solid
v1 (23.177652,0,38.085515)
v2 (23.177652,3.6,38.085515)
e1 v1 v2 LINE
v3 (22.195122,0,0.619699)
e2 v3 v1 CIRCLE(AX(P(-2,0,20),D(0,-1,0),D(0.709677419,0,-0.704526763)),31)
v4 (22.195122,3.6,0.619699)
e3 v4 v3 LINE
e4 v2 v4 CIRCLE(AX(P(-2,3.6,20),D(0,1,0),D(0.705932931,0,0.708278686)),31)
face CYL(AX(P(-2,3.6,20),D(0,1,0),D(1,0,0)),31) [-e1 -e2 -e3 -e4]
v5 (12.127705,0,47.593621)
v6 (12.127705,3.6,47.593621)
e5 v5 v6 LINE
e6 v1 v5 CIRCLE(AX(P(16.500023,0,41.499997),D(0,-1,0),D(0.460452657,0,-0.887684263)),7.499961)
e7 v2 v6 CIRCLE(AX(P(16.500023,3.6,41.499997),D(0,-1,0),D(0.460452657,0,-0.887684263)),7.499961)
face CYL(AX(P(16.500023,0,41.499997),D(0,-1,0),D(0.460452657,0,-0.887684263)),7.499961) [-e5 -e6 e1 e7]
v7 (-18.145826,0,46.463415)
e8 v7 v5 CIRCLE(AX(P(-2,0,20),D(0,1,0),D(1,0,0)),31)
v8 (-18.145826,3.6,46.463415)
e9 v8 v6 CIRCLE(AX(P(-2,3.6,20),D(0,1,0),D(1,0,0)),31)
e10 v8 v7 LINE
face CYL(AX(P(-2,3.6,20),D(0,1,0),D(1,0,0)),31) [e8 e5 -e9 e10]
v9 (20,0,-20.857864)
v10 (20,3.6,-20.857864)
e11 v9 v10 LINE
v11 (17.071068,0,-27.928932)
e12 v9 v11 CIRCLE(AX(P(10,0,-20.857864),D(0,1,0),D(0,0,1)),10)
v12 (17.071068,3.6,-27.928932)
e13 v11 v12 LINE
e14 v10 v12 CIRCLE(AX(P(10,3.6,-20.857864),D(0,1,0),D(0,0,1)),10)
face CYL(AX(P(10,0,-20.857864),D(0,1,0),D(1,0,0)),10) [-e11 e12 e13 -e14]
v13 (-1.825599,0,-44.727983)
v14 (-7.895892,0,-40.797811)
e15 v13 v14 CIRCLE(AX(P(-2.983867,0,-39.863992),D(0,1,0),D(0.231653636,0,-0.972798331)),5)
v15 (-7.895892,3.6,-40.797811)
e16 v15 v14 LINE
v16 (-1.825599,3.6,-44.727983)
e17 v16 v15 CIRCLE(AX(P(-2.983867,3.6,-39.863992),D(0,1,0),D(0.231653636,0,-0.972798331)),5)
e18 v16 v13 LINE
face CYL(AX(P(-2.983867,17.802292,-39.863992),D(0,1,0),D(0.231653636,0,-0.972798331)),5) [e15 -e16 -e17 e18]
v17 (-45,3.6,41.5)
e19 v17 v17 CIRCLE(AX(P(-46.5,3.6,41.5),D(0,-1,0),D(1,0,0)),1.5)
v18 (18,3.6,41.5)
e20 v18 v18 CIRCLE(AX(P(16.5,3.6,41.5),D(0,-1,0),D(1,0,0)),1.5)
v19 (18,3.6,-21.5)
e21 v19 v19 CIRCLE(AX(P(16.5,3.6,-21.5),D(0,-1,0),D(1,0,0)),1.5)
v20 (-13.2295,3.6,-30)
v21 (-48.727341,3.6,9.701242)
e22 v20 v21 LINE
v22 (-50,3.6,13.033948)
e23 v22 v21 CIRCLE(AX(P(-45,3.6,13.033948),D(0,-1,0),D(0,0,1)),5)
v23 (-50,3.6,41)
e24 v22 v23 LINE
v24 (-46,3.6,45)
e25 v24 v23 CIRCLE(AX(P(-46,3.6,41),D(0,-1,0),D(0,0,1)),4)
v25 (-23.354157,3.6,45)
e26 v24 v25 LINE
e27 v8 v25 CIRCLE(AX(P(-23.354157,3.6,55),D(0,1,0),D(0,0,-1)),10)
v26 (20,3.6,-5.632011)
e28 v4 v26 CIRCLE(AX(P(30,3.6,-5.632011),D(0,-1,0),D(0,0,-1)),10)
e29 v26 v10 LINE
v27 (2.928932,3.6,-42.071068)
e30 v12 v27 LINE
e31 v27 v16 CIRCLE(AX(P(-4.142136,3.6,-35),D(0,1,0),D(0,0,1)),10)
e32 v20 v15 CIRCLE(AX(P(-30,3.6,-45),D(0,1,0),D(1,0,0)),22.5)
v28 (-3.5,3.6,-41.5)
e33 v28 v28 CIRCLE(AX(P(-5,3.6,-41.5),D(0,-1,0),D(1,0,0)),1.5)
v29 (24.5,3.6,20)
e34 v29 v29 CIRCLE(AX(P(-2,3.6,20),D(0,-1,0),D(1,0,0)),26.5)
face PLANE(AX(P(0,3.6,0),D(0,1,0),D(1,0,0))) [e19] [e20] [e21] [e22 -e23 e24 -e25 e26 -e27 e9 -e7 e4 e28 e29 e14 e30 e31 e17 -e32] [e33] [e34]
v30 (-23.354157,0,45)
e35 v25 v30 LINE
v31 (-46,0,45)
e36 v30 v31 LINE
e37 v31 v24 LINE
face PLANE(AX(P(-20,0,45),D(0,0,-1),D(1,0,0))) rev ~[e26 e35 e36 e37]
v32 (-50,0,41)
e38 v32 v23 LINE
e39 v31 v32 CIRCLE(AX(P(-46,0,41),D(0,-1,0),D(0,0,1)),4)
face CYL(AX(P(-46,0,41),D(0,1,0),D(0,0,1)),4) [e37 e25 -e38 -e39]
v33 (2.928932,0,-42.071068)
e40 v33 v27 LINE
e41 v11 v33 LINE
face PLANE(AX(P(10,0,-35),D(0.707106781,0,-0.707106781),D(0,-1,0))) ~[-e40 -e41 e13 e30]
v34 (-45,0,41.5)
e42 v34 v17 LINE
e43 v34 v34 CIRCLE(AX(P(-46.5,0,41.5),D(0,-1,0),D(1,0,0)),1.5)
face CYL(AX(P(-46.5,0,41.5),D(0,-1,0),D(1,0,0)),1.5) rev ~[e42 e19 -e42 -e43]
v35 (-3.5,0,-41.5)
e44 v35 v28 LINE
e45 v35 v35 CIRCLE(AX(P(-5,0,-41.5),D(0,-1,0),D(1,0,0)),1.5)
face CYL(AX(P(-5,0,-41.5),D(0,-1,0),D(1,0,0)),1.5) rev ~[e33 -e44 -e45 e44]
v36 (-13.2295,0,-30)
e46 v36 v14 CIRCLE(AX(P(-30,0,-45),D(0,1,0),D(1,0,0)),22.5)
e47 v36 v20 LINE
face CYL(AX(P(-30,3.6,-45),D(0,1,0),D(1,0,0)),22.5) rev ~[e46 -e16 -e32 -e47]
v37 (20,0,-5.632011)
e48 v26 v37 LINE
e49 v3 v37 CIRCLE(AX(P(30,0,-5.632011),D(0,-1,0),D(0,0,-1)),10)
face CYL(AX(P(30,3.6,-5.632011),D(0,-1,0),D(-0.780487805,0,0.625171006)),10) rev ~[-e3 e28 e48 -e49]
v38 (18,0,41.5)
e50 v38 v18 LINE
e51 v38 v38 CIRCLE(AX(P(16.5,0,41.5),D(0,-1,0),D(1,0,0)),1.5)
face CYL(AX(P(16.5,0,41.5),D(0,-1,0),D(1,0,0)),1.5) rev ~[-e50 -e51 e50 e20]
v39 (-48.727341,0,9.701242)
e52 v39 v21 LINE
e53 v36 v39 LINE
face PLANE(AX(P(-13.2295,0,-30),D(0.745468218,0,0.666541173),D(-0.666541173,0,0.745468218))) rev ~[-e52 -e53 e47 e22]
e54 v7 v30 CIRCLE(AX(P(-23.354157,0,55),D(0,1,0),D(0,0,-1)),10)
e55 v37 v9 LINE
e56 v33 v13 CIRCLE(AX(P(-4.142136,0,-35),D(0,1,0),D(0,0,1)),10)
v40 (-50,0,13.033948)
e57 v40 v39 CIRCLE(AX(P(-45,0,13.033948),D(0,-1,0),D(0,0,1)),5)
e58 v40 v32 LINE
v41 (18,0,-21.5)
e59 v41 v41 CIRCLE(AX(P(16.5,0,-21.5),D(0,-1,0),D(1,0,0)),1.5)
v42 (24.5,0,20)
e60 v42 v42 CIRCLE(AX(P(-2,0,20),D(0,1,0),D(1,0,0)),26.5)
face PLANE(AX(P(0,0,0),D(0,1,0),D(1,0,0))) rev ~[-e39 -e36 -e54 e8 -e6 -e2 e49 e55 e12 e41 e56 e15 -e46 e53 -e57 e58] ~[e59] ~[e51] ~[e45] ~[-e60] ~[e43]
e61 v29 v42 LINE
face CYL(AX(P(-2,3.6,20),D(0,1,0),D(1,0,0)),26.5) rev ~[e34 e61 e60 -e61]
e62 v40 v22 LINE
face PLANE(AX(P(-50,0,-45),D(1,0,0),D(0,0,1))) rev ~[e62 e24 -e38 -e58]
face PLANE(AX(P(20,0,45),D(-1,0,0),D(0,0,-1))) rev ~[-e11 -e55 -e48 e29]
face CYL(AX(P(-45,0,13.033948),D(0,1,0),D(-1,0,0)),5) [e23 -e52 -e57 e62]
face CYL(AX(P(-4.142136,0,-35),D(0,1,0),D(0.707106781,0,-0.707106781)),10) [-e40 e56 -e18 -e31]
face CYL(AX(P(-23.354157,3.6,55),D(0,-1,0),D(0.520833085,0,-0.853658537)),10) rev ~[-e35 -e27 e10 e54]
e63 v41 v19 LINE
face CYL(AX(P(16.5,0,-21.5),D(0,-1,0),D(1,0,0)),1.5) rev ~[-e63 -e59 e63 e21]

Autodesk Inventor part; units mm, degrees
ref_plane "YZ Plane" through (0, 0, 0) normal (1, 0, 0) x (0, 1, 0)
ref_plane "XZ Plane" through (0, 0, 0) normal (0, 1, 0) x (-1, 0, 0)
ref_plane "XY Plane" through (0, 0, 0) normal (0, 0, 1) x (1, 0, 0)
sketch "Sketch1" plane through (0, 0, 0) normal (0, 1, 0) x (-1, 0, 0)
  line L0 (20, 45) -> (-20, 45)
  line L1 (-20, 45) -> (-20, -45)
  line L2 (-20, -45) -> (20, -45)
  line L3 (20, -45) -> (20, 45)
  line L4 (20, 45) -> (-20, -45) construction
  line L5 (-20, 45) -> (20, -45) construction
  line L6 (20, -45) -> (50, -45)
  line L7 (50, -45) -> (50, 45)
  line L8 (50, 45) -> (20, 45)
  line L9 (20, 45) -> (20, -45)
  point P0 (0, 0)
  dimension "d0" = 40
  dimension "d1" = 90
  dimension "d7" = 30
  dimension "d8" = 90
extrude "Extrusion1" add sketch "Sketch1" along normal blind 3.6
sketch "Sketch3" plane through (0, 3.6, 0) normal (0, 1, 0) x (1, 0, 0)
  line L0 (-50, 45) -> (-50, -45) projected
  circle A0 centre (-30, 45) radius 22.5
  point P0 (0, 0)
  point P1 (20, 45)
  dimension "d37" = 20
  dimension "d38" = 45
extrude "Extrusion3" cut sketch "Sketch3" against normal blind 10
fillet "Fillet2" radius 4 3 edges at (-50, 1.8, 45) (20, 1.8, 45) (-50, 1.8, -34.6922)
chamfer "Chamfer1" distance 20 angle 45 1 edges at (20, 1.8, -45)
fillet "Fillet4" radius 10 2 edges at (0, 1.8, -45) (20, 1.8, -25)
fillet "Fillet5" radius 5 1 edges at (-7.5, 1.8, -45)
sketch "Sketch9" plane through (0, 0, 0) normal (0, -1, 0) x (1, 0, 0)
  circle A0 centre (-46.5, 41.5) radius 1.5
  line L0 (-46, 45) -> (16, 45) projected
  line L1 (-50, -23.8754) -> (-50, 41) projected
  arc A1 (-50, -23.8754) -> (-43.5849, -27.064) centre (-46, -23.8754) ccw projected
  point P0 (0, 0)
  dimension "d70" = 3
  dimension "d72" = 3.5
  dimension "d73" = 3.5
extrude "Extrusion9" cut sketch "Sketch9" against normal blind 10
sketch "Sketch4" plane through (0, 3.6, 0) normal (0, 1, 0) x (1, 0, 0)
  circle A0 centre (-2, -20) radius 31
  line L0 (20, -41) -> (20, 45) projected
  line L1 (-46, -45) -> (16, -45) projected
  point P0 (0, 0)
  point P1 (20, 23.8754)
  dimension "d14" = 62
  dimension "d15" = 22
  dimension "d16" = 25
extrude "Extrusion4" add sketch "Sketch4" against normal blind 3.6
sketch "Sketch12" plane through (0, 3.6, 0) normal (0, 1, 0) x (1, 0, 0)
  arc A0 (19.8839, -41.9566) -> (20, 1.8403) centre (-2, -20) ccw projected
  circle A1 centre (-2, -20) radius 26.5
  point P0 (0, 0)
  dimension "d95" = 53
extrude "Extrusion12" cut sketch "Sketch12" against normal blind 10
fillet "Fillet8" radius 10 2 edges at (-20.3303, 1.8, 45) (20, 1.8, -1.8403)
sketch "Sketch7" plane through (-32.64, 0, 1.0706) normal (0, -1, 0) x (1, 0, 0)
  circle A0 centre (27.64, -42.5706) radius 1.5
  circle A1 centre (49.14, -22.5706) radius 1.5
  circle A2 centre (49.14, 40.4294) radius 1.5
  line L0 (25.8579, -46.0706) -> (23.6643, -46.0706)
  line L1 (52.64, 41) -> (52.64, -20.8579)
  line L2 (-20, -45) -> (-20, 41)
  line L3 (-16, 43.9294) -> (46, 43.9294)
  line L4 (-13.36, 43.9294) -> (48.64, 43.9294) projected
  line L5 (52.64, 39.9294) -> (52.64, -21.9285) projected
  point P0 (0, 0)
  dimension "d56" = 3
  dimension "d53" = 3
  dimension "d50" = 3
  dimension "d58" = 3.5
  dimension "d55" = 3.5
  dimension "d57" = 25
  dimension "d54" = 20
  dimension "d52" = 3.5
  dimension "d51" = 3.5
  dimension "d62" = 0
  dimension "d63" = 0
  dimension "d79" = 90
extrude "Extrusion7" cut sketch "Sketch7" against normal blind 10
sketch "Sketch13" plane through (0, 0, 0) normal (0, -1, 0) x (1, 0, 0)
  circle A0 centre (16.5, 41.5) radius 1.5 projected
  arc A1 (19.9534, 34.8424) -> (9.4018, 43.9217) centre (16.5, 41.5) ccw
  circle A2 centre (-2, 20) radius 26.5 projected
  circle A3 centre (-2, 20) radius 26.5
  circle A4 centre (16.5, 41.5) radius 2.7131
  point P0 (0, 0)
  dimension "d97" = 15
extrude "Extrusion13" add sketch "Sketch13" against normal blind 3.6 contours A2 A4 A1 | A2 A4 picked at (14.5458, 40.9715)
sketch "Sketch14" plane through (0, 0, 0) normal (0, -1, 0) x (1, 0, 0)
  arc A0 (-7.8959, -40.7978) -> (-43.5849, -27.064) centre (-30, -45) ccw projected
  line L0 (-13.2295, -30) -> (-50, 11.1246)
  line L1 (-50, -23.8754) -> (-50, 41) projected
  line L2 (-50, 11.1246) -> (-50, -45)
  line L3 (-50, -45) -> (-13.2295, -30)
  point P0 (0, 0)
  dimension "d100" = 35
  dimension "d101" = 15
extrude "Extrusion14" cut sketch "Sketch14" against normal blind 3.6
fillet "Fillet9" radius 5 1 edges at (-50, 1.8, 11.1246)
properties part number "p1"
